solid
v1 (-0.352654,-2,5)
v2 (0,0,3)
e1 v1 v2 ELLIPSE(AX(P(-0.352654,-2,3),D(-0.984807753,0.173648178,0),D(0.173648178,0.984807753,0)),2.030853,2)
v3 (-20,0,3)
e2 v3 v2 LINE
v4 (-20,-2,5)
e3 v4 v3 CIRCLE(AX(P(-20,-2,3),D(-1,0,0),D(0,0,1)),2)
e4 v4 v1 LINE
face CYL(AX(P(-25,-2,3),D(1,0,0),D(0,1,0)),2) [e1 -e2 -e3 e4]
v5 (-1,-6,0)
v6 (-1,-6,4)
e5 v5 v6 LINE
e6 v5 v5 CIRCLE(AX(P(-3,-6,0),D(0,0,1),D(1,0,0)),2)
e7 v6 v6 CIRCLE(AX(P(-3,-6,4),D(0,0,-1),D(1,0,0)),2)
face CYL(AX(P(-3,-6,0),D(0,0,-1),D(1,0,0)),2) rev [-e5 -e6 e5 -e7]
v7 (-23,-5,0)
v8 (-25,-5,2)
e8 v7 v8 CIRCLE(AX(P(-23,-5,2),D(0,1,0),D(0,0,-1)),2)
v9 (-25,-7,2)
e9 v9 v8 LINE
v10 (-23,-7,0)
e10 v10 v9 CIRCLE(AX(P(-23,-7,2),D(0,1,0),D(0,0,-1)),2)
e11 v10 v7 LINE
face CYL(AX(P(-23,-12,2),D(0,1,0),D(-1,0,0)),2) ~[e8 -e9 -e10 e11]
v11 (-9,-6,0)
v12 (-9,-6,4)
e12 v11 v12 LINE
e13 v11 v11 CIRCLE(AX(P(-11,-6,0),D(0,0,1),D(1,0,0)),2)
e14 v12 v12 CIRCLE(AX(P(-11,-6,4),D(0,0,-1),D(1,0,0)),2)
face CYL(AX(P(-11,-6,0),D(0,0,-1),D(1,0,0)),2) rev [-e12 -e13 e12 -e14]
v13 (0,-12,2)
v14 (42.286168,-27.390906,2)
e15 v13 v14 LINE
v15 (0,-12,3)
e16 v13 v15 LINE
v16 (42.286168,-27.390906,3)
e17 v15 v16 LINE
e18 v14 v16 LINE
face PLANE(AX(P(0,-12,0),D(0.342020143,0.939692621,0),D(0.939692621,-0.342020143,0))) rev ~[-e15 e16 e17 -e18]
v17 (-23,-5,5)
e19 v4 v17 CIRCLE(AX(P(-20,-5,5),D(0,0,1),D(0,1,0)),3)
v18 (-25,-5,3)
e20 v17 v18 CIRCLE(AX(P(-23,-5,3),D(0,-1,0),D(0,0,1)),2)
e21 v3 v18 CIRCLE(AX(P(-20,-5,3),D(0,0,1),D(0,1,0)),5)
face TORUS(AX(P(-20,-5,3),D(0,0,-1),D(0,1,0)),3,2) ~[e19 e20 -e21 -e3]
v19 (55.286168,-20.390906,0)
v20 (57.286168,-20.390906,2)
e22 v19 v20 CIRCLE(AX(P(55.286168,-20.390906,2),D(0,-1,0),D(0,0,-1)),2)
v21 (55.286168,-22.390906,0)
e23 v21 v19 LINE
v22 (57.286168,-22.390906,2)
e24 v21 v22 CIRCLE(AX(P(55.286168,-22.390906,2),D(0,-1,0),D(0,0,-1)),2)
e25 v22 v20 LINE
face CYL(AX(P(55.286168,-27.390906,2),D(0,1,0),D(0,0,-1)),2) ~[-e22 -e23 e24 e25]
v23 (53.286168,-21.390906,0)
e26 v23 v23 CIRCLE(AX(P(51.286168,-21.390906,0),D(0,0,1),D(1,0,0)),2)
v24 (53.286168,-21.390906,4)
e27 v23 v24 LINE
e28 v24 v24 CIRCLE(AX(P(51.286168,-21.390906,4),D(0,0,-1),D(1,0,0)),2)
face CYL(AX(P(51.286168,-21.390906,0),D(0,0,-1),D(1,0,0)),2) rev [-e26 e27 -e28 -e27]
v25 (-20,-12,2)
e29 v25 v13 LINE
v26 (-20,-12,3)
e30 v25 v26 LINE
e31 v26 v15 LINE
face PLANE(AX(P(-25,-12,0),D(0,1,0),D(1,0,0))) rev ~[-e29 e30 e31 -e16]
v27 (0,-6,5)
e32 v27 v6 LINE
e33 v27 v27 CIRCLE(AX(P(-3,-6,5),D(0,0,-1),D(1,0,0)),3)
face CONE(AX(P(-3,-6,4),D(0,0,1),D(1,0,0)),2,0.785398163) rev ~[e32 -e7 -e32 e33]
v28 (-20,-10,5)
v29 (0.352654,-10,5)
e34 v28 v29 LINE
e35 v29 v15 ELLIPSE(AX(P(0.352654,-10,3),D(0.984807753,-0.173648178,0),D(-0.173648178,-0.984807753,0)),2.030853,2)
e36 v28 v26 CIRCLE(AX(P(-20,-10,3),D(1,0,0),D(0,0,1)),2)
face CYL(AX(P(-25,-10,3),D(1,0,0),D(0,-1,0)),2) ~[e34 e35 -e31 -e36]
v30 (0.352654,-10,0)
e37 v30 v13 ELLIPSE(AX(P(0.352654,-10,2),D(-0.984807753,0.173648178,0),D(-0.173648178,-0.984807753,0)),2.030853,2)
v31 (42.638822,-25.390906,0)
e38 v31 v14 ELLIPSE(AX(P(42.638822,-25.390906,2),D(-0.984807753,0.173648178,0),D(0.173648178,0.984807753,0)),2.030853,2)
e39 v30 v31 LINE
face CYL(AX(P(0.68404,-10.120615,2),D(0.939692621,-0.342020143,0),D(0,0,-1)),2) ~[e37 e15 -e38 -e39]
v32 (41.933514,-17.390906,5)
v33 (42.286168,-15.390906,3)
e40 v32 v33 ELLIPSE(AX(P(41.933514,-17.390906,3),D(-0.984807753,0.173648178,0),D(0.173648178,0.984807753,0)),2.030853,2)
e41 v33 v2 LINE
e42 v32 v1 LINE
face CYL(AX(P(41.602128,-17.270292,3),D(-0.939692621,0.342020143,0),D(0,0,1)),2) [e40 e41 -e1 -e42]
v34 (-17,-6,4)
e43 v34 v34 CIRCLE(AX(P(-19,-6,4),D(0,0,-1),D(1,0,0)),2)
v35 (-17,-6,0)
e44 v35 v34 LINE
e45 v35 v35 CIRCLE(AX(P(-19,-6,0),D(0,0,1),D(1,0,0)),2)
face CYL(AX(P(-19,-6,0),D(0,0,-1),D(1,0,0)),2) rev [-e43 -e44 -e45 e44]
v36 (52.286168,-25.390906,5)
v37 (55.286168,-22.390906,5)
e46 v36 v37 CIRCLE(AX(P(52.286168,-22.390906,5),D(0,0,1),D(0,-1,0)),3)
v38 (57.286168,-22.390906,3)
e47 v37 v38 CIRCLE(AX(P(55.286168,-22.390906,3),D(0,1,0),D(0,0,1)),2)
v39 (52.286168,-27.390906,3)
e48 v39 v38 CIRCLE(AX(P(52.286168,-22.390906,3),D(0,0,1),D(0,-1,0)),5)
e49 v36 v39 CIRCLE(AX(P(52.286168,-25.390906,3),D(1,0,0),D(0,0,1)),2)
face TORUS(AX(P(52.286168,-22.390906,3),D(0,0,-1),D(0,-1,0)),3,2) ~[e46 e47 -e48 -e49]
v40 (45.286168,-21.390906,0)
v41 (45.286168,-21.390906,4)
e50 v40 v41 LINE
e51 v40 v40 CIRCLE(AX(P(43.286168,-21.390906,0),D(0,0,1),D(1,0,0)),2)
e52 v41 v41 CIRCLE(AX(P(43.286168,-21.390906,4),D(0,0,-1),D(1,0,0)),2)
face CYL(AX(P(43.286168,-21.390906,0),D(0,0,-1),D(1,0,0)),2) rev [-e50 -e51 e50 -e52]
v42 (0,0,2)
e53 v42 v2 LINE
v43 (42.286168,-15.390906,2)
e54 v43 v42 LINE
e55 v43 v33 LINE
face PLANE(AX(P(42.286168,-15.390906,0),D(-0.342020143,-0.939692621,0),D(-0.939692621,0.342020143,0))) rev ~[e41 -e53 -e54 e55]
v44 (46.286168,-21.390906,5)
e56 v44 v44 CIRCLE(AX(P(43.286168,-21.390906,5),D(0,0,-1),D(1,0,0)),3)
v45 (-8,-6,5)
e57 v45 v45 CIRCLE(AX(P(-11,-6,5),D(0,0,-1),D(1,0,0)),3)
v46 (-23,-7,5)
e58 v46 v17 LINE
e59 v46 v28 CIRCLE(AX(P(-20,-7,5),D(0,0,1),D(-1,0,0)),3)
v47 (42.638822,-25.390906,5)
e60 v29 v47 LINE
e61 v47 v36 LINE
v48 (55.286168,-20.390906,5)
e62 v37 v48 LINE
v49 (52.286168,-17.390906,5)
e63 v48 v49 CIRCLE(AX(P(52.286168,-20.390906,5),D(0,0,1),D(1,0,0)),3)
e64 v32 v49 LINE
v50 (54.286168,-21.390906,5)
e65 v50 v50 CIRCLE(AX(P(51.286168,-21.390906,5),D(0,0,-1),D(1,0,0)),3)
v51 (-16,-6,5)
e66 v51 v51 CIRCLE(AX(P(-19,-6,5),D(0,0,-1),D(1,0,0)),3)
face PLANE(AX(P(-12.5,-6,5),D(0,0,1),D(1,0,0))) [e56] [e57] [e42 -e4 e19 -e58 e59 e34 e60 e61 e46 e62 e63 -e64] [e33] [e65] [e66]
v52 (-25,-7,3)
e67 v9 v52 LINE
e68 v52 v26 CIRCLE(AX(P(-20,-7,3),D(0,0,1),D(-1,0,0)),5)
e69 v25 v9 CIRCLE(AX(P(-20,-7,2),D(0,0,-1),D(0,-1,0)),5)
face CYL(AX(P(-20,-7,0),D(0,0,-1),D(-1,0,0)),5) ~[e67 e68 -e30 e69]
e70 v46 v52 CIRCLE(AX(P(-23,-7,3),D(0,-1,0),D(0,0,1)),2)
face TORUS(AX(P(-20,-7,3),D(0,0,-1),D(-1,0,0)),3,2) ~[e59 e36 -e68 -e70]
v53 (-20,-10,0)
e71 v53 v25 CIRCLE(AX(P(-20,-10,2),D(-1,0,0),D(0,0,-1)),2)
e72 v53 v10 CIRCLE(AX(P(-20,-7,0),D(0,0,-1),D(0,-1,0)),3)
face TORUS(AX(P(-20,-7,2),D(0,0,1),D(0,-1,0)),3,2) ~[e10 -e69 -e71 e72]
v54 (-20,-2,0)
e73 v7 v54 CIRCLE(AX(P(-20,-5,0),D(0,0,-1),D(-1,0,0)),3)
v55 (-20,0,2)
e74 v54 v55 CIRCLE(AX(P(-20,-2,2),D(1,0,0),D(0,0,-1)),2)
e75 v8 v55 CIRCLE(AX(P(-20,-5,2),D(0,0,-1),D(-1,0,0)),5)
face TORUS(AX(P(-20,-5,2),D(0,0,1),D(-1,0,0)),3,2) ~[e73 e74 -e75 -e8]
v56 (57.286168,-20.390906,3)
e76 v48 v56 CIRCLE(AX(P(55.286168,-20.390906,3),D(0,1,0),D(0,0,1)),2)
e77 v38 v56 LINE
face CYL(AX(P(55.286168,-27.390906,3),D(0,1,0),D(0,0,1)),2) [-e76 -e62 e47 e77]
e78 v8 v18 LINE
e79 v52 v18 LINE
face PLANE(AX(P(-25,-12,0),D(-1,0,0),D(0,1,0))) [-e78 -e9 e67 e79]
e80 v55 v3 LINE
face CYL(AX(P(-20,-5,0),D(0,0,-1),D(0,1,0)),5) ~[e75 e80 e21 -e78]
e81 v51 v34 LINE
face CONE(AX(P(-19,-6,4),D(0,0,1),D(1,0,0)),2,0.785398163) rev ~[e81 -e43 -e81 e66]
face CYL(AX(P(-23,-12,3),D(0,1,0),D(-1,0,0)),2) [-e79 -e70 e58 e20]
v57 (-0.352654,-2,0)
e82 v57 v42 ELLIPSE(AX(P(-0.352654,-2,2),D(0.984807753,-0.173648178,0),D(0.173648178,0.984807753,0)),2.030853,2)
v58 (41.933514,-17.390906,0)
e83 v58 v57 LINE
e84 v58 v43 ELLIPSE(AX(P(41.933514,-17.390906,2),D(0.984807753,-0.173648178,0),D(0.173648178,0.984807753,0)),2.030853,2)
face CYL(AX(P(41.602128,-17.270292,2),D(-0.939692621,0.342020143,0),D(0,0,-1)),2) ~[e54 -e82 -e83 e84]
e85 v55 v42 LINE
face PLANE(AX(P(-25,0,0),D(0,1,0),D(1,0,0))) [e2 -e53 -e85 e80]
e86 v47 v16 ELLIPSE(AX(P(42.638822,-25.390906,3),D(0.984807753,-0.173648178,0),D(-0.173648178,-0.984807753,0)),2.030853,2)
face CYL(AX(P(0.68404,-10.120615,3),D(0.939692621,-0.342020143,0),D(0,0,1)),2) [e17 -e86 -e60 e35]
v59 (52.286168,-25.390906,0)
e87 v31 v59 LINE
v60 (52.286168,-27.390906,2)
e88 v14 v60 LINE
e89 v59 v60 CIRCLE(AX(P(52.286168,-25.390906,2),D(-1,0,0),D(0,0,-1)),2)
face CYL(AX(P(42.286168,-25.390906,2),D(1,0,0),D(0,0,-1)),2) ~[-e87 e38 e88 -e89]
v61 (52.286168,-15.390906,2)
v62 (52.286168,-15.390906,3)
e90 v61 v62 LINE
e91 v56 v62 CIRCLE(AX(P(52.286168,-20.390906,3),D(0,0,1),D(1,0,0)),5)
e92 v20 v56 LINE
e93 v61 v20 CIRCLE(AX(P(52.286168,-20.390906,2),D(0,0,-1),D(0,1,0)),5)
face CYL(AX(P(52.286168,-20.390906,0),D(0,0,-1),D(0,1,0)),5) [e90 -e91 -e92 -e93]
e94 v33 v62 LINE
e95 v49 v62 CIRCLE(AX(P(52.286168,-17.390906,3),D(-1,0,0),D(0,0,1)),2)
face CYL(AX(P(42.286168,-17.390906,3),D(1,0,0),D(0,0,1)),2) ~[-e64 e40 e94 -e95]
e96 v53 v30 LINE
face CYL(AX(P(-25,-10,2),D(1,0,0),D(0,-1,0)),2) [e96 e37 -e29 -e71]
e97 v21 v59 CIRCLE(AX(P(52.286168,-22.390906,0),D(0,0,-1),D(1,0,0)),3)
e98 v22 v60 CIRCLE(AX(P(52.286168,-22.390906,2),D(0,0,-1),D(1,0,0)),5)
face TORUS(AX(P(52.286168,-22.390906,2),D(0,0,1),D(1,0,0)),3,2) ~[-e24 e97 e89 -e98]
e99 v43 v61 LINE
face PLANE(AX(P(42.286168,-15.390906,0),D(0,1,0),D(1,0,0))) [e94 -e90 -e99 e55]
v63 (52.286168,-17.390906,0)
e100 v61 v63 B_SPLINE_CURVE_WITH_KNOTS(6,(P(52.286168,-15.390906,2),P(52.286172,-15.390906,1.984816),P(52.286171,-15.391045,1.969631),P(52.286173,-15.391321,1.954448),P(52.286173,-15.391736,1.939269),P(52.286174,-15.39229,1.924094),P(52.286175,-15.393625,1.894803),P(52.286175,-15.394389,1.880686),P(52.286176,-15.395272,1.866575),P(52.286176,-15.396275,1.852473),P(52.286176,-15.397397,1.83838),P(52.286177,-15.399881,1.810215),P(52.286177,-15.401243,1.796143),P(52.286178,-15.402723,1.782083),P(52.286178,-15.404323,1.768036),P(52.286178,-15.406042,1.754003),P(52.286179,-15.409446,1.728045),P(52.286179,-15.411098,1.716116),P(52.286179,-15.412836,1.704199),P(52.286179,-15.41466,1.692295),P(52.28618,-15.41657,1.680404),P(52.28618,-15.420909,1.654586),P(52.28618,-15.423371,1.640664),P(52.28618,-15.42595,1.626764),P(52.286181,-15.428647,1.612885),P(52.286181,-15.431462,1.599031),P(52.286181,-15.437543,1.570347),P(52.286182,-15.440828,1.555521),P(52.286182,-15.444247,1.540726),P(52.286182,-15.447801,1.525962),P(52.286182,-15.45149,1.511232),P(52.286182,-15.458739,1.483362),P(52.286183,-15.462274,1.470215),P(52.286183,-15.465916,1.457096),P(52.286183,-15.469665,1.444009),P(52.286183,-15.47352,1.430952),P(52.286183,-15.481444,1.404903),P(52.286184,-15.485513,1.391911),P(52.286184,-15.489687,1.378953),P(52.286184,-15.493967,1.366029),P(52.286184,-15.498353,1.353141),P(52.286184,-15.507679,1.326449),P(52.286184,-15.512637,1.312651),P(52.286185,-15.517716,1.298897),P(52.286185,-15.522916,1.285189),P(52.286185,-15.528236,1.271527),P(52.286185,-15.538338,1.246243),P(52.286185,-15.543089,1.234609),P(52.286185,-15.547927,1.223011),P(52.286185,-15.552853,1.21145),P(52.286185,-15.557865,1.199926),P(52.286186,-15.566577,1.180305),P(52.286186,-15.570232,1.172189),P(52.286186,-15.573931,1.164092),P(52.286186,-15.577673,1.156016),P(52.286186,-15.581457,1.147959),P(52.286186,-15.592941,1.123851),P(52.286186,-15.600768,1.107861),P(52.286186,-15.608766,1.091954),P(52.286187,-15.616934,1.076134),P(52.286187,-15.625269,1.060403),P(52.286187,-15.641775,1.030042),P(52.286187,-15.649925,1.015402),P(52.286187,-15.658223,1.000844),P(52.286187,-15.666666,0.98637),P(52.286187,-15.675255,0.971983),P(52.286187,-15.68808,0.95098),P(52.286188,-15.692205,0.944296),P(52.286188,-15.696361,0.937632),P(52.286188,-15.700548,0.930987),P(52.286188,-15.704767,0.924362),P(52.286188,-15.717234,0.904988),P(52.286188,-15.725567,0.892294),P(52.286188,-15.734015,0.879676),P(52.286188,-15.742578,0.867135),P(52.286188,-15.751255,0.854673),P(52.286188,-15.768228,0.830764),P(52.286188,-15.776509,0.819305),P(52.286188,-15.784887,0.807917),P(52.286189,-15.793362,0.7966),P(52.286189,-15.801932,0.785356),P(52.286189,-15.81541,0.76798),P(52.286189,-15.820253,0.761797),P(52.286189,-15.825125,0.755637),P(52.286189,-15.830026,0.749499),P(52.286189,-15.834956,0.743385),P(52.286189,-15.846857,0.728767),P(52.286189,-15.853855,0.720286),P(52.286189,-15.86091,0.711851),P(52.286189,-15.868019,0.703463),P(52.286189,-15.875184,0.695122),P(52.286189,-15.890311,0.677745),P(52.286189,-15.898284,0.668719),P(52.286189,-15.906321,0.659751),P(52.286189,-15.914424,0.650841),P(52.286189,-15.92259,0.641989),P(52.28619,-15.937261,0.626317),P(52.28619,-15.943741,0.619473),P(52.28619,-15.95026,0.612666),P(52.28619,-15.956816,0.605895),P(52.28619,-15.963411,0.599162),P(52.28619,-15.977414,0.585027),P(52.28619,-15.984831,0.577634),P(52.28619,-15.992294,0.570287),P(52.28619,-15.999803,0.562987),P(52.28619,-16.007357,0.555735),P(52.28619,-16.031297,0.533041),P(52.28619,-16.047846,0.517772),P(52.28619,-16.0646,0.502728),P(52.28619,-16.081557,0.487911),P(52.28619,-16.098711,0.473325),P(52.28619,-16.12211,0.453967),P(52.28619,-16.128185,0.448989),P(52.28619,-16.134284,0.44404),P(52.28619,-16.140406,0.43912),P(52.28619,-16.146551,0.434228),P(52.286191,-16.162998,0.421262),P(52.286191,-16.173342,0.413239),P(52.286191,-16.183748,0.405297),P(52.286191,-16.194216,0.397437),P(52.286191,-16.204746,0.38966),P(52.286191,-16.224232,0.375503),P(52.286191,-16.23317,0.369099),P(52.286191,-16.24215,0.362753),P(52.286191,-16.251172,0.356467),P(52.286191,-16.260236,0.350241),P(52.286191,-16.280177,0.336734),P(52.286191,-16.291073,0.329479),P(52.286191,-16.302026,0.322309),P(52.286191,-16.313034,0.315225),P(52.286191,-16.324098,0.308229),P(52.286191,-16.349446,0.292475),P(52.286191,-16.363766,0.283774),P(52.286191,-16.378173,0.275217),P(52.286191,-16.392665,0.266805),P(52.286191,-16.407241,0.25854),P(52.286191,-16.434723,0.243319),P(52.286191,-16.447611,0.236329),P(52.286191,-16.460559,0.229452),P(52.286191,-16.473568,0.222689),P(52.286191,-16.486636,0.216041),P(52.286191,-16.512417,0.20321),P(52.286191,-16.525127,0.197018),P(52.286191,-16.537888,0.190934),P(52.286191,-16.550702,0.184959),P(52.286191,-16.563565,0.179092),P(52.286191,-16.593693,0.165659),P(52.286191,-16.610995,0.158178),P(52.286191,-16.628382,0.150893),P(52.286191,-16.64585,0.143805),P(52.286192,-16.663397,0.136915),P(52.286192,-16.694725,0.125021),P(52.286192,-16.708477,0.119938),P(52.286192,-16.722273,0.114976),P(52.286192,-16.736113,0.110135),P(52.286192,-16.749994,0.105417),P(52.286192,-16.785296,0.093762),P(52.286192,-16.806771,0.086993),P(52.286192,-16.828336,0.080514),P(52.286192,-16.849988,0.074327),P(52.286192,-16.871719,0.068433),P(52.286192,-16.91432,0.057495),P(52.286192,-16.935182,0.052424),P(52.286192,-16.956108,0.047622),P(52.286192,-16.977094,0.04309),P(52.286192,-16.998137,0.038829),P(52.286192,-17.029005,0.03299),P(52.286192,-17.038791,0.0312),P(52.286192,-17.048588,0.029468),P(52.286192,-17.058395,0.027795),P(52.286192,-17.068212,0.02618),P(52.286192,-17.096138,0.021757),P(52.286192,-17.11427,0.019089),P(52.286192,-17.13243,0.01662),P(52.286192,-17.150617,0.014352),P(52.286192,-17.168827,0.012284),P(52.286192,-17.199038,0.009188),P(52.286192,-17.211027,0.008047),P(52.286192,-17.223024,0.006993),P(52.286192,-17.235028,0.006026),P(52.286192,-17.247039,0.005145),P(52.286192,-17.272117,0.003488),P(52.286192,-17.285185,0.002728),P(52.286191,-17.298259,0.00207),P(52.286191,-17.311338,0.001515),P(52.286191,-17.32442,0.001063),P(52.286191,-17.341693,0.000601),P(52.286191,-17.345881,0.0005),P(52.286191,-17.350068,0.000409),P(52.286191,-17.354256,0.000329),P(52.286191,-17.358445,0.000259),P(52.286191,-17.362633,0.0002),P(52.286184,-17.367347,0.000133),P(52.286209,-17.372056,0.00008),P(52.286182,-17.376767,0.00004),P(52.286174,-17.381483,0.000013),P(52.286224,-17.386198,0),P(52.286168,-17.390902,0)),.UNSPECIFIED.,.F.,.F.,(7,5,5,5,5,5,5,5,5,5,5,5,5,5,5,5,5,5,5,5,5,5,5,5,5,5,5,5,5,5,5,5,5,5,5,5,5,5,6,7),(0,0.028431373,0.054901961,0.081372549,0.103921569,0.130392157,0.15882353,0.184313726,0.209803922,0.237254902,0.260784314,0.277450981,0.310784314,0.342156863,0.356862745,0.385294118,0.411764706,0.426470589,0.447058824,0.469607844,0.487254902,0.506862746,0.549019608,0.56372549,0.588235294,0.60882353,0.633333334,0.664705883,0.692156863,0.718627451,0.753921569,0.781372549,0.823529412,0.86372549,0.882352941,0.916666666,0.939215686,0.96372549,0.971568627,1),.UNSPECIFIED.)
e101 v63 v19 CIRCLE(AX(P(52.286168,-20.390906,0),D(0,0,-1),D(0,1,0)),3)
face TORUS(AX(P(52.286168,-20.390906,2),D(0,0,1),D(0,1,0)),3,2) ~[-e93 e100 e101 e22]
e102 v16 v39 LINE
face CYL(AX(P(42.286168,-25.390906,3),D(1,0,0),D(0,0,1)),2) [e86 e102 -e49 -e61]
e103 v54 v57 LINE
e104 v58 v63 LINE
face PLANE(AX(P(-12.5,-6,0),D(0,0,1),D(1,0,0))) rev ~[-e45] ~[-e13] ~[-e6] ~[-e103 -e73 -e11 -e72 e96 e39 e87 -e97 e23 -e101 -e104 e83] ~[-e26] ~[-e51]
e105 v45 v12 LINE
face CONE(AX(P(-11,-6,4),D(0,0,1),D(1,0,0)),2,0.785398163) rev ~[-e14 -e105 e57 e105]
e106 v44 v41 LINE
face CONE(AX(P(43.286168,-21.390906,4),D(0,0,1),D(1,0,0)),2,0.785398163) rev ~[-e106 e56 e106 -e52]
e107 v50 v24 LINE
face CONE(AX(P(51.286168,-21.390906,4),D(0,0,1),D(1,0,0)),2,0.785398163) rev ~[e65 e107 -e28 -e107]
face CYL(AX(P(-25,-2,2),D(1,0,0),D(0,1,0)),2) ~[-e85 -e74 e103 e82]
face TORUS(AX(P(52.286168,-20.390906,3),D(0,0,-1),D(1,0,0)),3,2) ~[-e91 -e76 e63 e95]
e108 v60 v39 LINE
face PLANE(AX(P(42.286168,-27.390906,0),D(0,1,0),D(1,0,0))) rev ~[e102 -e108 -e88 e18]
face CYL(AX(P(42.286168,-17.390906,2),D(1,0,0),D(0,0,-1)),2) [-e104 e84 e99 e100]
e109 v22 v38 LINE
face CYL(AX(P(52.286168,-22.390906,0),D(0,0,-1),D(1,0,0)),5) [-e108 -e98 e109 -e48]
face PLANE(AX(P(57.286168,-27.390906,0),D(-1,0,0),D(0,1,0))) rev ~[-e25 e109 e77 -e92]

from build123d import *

# Parameters (mm, degrees)
F0_W         = 25
F0_H         = 12
F0_W_2       = 15
F1_DEPTH     = 5
F2_R         = 2
F3_DEPTH     = 5.001
F4_R         = 2
F5_T1_DEPTH  = 5
F5_T4_ANGLE  = 90
F5_T6_ANGLE  = 90
F5_T8_ANGLE  = 90
F5_T10_ANGLE = 90
F5_T12_ANGLE = 90
F5_T14_ANGLE = 90
F5_T16_ANGLE = 90
F5_T18_ANGLE = 90
F6_SIZE      = 1


# Not quite as in the source:
# - a fillet or chamfer that OpenCascade refuses, or shapes differently, is made with other operations: its cross-section is extruded or revolved along the edge and cut away or added


with BuildPart() as f1:
    # F0 (on Top) → F1 (new body)
    with BuildSketch(Plane.XY):
        with Locations((-12.5, -6)):
            Rectangle(F0_W, F0_H)
        Polygon((42.2861679354, -15.3909064497), (0, 0), (0, -12), (42.2861679354, -27.3909064497), align=None)
        with Locations((49.7861679354, -21.3909064497)):
            Rectangle(F0_W_2, F0_H)
    extrude(amount=F1_DEPTH)

    # F2 (on Top) → F3 (cut, through all)
    with BuildSketch(Plane.XY):
        with Locations((51.2861679354, -21.3909064497)):
            Circle(F2_R)
        with Locations((-19, -6)):
            Circle(F2_R)
        with Locations((43.2861679354, -21.3909064497)):
            Circle(F2_R)
        with Locations((-11, -6)):
            Circle(F2_R)
        with Locations((-3, -6)):
            Circle(F2_R)
    extrude(amount=F3_DEPTH, mode=Mode.SUBTRACT)

    # F4
    f4_edges = [f1.edges().sort_by_distance(p)[0] for p in [
        (21.143084, -19.695453, 5),
        (21.143084, -7.695453, 5),
        (-12.5, -12, 5),
        (-12.5, 0, 5),
        (49.786168, -27.390906, 5),
        (57.286168, -21.390906, 5),
        (49.786168, -15.390906, 5),
        (49.786168, -27.390906, 0),
        (21.143084, -19.695453, 0),
        (-12.5, -12, 0),
        (57.286168, -21.390906, 0),
        (21.143084, -7.695453, 0),
        (49.786168, -15.390906, 0),
        (-12.5, 0, 0),
        (-25, -6, 0),
        (-25, -6, 5),
    ]]
    fillet(f4_edges, radius=F4_R)

    # F5: fillet of radius 5 on 4 edges, made by hand

    # F5_s2 → F5_t1 (cut)
    with BuildSketch(Plane.XY):
        with BuildLine():
            ThreePointArc((52.2861679354, -15.3909064497), (55.8217018413, -16.8553725437), (57.2861679354, -20.3909064497))
            Line((57.2861679354, -20.3909064497), (57.2861679354, -15.3909064497))
            Line((57.2861679354, -15.3909064497), (52.2861679354, -15.3909064497))
        make_face()
        with BuildLine():
            ThreePointArc((-20, 0), (-23.5355339059, -1.4644660941), (-25, -5))
            Line((-25, -5), (-25, 0))
            Line((-25, 0), (-20, 0))
        make_face()
        with BuildLine():
            ThreePointArc((-25, -7), (-23.5355339059, -10.5355339059), (-20, -12))
            Line((-20, -12), (-25, -12))
            Line((-25, -12), (-25, -7))
        make_face()
        with BuildLine():
            ThreePointArc((57.2861679354, -22.3909064497), (55.8217018413, -25.9264403556), (52.2861679354, -27.3909064497))
            Line((52.2861679354, -27.3909064497), (57.2861679354, -27.3909064497))
            Line((57.2861679354, -27.3909064497), (57.2861679354, -22.3909064497))
        make_face()
    extrude(amount=F5_T1_DEPTH, mode=Mode.SUBTRACT)

    # F5_s3 → F5_t4 (revolve, cut)
    with BuildSketch(Plane.YZ.offset(52.2861679354)):
        with BuildLine():
            ThreePointArc((-25.3909064497, 5), (-26.805120012, 4.4142135624), (-27.3909064497, 3))
            Line((-27.3909064497, 3), (-27.3909064497, 5))
            Line((-27.3909064497, 5), (-25.3909064497, 5))
        make_face()
    revolve(axis=Axis((52.2861679354, -22.3909064497, 5), (0, 0, 1)), revolution_arc=F5_T4_ANGLE, mode=Mode.SUBTRACT)

    # F5_s5 → F5_t6 (revolve, cut)
    with BuildSketch(Plane.XZ.offset(7)):
        with BuildLine():
            ThreePointArc((-23, 5), (-24.4142135624, 4.4142135624), (-25, 3))
            Line((-25, 3), (-25, 5))
            Line((-25, 5), (-23, 5))
        make_face()
    revolve(axis=Axis((-20, -7, 5), (0, 0, 1)), revolution_arc=F5_T6_ANGLE, mode=Mode.SUBTRACT)

    # F5_s7 → F5_t8 (revolve, cut)
    with BuildSketch(Plane.YZ.offset(-20)):
        with BuildLine():
            ThreePointArc((-2, 5), (-0.5857864376, 4.4142135624), (0, 3))
            Line((0, 3), (0, 5))
            Line((0, 5), (-2, 5))
        make_face()
    revolve(axis=Axis((-20, -5, 5), (0, 0, 1)), revolution_arc=F5_T8_ANGLE, mode=Mode.SUBTRACT)

    # F5_s9 → F5_t10 (revolve, cut)
    with BuildSketch(Plane.XZ.offset(5)):
        with BuildLine():
            ThreePointArc((-23, 0), (-24.4142135624, 0.5857864376), (-25, 2))
            Line((-25, 2), (-25, 0))
            Line((-25, 0), (-23, 0))
        make_face()
    revolve(axis=Axis((-20, -5, 0), (0, 0, -1)), revolution_arc=F5_T10_ANGLE, mode=Mode.SUBTRACT)

    # F5_s11 → F5_t12 (revolve, cut)
    with BuildSketch(Plane.YZ.offset(-20)):
        with BuildLine():
            ThreePointArc((-10, 0), (-11.4142135624, 0.5857864376), (-12, 2))
            Line((-12, 2), (-12, 0))
            Line((-12, 0), (-10, 0))
        make_face()
    revolve(axis=Axis((-20, -7, 0), (0, 0, -1)), revolution_arc=F5_T12_ANGLE, mode=Mode.SUBTRACT)

    # F5_s13 → F5_t14 (revolve, cut)
    with BuildSketch(Plane.XZ.offset(22.3909064497)):
        with BuildLine():
            ThreePointArc((55.2861679354, 0), (56.7003814977, 0.5857864376), (57.2861679354, 2))
            Line((57.2861679354, 2), (57.2861679354, 0))
            Line((57.2861679354, 0), (55.2861679354, 0))
        make_face()
    revolve(axis=Axis((52.2861679354, -22.3909064497, 0), (0, 0, -1)), revolution_arc=F5_T14_ANGLE, mode=Mode.SUBTRACT)

    # F5_s15 → F5_t16 (revolve, cut)
    with BuildSketch(Plane.YZ.offset(52.2861679354)):
        with BuildLine():
            ThreePointArc((-17.3909064497, 0), (-15.9766928873, 0.5857864376), (-15.3909064497, 2))
            Line((-15.3909064497, 2), (-15.3909064497, 0))
            Line((-15.3909064497, 0), (-17.3909064497, 0))
        make_face()
    revolve(axis=Axis((52.2861679354, -20.3909064497, 0), (0, 0, -1)), revolution_arc=F5_T16_ANGLE, mode=Mode.SUBTRACT)

    # F5_s17 → F5_t18 (revolve, cut)
    with BuildSketch(Plane.XZ.offset(20.3909064497)):
        with BuildLine():
            ThreePointArc((55.2861679354, 5), (56.7003814977, 4.4142135624), (57.2861679354, 3))
            Line((57.2861679354, 3), (57.2861679354, 5))
            Line((57.2861679354, 5), (55.2861679354, 5))
        make_face()
    revolve(axis=Axis((52.2861679354, -20.3909064497, 5), (0, 0, 1)), revolution_arc=F5_T18_ANGLE, mode=Mode.SUBTRACT)

    # F6
    f6_edges = [f1.edges().sort_by_distance(p)[0] for p in [
        (-21, -6, 5),
        (-13, -6, 5),
        (-5, -6, 5),
        (41.286168, -21.390906, 5),
        (49.286168, -21.390906, 5),
    ]]
    chamfer(f6_edges, length=F6_SIZE)


solid = f1.part
